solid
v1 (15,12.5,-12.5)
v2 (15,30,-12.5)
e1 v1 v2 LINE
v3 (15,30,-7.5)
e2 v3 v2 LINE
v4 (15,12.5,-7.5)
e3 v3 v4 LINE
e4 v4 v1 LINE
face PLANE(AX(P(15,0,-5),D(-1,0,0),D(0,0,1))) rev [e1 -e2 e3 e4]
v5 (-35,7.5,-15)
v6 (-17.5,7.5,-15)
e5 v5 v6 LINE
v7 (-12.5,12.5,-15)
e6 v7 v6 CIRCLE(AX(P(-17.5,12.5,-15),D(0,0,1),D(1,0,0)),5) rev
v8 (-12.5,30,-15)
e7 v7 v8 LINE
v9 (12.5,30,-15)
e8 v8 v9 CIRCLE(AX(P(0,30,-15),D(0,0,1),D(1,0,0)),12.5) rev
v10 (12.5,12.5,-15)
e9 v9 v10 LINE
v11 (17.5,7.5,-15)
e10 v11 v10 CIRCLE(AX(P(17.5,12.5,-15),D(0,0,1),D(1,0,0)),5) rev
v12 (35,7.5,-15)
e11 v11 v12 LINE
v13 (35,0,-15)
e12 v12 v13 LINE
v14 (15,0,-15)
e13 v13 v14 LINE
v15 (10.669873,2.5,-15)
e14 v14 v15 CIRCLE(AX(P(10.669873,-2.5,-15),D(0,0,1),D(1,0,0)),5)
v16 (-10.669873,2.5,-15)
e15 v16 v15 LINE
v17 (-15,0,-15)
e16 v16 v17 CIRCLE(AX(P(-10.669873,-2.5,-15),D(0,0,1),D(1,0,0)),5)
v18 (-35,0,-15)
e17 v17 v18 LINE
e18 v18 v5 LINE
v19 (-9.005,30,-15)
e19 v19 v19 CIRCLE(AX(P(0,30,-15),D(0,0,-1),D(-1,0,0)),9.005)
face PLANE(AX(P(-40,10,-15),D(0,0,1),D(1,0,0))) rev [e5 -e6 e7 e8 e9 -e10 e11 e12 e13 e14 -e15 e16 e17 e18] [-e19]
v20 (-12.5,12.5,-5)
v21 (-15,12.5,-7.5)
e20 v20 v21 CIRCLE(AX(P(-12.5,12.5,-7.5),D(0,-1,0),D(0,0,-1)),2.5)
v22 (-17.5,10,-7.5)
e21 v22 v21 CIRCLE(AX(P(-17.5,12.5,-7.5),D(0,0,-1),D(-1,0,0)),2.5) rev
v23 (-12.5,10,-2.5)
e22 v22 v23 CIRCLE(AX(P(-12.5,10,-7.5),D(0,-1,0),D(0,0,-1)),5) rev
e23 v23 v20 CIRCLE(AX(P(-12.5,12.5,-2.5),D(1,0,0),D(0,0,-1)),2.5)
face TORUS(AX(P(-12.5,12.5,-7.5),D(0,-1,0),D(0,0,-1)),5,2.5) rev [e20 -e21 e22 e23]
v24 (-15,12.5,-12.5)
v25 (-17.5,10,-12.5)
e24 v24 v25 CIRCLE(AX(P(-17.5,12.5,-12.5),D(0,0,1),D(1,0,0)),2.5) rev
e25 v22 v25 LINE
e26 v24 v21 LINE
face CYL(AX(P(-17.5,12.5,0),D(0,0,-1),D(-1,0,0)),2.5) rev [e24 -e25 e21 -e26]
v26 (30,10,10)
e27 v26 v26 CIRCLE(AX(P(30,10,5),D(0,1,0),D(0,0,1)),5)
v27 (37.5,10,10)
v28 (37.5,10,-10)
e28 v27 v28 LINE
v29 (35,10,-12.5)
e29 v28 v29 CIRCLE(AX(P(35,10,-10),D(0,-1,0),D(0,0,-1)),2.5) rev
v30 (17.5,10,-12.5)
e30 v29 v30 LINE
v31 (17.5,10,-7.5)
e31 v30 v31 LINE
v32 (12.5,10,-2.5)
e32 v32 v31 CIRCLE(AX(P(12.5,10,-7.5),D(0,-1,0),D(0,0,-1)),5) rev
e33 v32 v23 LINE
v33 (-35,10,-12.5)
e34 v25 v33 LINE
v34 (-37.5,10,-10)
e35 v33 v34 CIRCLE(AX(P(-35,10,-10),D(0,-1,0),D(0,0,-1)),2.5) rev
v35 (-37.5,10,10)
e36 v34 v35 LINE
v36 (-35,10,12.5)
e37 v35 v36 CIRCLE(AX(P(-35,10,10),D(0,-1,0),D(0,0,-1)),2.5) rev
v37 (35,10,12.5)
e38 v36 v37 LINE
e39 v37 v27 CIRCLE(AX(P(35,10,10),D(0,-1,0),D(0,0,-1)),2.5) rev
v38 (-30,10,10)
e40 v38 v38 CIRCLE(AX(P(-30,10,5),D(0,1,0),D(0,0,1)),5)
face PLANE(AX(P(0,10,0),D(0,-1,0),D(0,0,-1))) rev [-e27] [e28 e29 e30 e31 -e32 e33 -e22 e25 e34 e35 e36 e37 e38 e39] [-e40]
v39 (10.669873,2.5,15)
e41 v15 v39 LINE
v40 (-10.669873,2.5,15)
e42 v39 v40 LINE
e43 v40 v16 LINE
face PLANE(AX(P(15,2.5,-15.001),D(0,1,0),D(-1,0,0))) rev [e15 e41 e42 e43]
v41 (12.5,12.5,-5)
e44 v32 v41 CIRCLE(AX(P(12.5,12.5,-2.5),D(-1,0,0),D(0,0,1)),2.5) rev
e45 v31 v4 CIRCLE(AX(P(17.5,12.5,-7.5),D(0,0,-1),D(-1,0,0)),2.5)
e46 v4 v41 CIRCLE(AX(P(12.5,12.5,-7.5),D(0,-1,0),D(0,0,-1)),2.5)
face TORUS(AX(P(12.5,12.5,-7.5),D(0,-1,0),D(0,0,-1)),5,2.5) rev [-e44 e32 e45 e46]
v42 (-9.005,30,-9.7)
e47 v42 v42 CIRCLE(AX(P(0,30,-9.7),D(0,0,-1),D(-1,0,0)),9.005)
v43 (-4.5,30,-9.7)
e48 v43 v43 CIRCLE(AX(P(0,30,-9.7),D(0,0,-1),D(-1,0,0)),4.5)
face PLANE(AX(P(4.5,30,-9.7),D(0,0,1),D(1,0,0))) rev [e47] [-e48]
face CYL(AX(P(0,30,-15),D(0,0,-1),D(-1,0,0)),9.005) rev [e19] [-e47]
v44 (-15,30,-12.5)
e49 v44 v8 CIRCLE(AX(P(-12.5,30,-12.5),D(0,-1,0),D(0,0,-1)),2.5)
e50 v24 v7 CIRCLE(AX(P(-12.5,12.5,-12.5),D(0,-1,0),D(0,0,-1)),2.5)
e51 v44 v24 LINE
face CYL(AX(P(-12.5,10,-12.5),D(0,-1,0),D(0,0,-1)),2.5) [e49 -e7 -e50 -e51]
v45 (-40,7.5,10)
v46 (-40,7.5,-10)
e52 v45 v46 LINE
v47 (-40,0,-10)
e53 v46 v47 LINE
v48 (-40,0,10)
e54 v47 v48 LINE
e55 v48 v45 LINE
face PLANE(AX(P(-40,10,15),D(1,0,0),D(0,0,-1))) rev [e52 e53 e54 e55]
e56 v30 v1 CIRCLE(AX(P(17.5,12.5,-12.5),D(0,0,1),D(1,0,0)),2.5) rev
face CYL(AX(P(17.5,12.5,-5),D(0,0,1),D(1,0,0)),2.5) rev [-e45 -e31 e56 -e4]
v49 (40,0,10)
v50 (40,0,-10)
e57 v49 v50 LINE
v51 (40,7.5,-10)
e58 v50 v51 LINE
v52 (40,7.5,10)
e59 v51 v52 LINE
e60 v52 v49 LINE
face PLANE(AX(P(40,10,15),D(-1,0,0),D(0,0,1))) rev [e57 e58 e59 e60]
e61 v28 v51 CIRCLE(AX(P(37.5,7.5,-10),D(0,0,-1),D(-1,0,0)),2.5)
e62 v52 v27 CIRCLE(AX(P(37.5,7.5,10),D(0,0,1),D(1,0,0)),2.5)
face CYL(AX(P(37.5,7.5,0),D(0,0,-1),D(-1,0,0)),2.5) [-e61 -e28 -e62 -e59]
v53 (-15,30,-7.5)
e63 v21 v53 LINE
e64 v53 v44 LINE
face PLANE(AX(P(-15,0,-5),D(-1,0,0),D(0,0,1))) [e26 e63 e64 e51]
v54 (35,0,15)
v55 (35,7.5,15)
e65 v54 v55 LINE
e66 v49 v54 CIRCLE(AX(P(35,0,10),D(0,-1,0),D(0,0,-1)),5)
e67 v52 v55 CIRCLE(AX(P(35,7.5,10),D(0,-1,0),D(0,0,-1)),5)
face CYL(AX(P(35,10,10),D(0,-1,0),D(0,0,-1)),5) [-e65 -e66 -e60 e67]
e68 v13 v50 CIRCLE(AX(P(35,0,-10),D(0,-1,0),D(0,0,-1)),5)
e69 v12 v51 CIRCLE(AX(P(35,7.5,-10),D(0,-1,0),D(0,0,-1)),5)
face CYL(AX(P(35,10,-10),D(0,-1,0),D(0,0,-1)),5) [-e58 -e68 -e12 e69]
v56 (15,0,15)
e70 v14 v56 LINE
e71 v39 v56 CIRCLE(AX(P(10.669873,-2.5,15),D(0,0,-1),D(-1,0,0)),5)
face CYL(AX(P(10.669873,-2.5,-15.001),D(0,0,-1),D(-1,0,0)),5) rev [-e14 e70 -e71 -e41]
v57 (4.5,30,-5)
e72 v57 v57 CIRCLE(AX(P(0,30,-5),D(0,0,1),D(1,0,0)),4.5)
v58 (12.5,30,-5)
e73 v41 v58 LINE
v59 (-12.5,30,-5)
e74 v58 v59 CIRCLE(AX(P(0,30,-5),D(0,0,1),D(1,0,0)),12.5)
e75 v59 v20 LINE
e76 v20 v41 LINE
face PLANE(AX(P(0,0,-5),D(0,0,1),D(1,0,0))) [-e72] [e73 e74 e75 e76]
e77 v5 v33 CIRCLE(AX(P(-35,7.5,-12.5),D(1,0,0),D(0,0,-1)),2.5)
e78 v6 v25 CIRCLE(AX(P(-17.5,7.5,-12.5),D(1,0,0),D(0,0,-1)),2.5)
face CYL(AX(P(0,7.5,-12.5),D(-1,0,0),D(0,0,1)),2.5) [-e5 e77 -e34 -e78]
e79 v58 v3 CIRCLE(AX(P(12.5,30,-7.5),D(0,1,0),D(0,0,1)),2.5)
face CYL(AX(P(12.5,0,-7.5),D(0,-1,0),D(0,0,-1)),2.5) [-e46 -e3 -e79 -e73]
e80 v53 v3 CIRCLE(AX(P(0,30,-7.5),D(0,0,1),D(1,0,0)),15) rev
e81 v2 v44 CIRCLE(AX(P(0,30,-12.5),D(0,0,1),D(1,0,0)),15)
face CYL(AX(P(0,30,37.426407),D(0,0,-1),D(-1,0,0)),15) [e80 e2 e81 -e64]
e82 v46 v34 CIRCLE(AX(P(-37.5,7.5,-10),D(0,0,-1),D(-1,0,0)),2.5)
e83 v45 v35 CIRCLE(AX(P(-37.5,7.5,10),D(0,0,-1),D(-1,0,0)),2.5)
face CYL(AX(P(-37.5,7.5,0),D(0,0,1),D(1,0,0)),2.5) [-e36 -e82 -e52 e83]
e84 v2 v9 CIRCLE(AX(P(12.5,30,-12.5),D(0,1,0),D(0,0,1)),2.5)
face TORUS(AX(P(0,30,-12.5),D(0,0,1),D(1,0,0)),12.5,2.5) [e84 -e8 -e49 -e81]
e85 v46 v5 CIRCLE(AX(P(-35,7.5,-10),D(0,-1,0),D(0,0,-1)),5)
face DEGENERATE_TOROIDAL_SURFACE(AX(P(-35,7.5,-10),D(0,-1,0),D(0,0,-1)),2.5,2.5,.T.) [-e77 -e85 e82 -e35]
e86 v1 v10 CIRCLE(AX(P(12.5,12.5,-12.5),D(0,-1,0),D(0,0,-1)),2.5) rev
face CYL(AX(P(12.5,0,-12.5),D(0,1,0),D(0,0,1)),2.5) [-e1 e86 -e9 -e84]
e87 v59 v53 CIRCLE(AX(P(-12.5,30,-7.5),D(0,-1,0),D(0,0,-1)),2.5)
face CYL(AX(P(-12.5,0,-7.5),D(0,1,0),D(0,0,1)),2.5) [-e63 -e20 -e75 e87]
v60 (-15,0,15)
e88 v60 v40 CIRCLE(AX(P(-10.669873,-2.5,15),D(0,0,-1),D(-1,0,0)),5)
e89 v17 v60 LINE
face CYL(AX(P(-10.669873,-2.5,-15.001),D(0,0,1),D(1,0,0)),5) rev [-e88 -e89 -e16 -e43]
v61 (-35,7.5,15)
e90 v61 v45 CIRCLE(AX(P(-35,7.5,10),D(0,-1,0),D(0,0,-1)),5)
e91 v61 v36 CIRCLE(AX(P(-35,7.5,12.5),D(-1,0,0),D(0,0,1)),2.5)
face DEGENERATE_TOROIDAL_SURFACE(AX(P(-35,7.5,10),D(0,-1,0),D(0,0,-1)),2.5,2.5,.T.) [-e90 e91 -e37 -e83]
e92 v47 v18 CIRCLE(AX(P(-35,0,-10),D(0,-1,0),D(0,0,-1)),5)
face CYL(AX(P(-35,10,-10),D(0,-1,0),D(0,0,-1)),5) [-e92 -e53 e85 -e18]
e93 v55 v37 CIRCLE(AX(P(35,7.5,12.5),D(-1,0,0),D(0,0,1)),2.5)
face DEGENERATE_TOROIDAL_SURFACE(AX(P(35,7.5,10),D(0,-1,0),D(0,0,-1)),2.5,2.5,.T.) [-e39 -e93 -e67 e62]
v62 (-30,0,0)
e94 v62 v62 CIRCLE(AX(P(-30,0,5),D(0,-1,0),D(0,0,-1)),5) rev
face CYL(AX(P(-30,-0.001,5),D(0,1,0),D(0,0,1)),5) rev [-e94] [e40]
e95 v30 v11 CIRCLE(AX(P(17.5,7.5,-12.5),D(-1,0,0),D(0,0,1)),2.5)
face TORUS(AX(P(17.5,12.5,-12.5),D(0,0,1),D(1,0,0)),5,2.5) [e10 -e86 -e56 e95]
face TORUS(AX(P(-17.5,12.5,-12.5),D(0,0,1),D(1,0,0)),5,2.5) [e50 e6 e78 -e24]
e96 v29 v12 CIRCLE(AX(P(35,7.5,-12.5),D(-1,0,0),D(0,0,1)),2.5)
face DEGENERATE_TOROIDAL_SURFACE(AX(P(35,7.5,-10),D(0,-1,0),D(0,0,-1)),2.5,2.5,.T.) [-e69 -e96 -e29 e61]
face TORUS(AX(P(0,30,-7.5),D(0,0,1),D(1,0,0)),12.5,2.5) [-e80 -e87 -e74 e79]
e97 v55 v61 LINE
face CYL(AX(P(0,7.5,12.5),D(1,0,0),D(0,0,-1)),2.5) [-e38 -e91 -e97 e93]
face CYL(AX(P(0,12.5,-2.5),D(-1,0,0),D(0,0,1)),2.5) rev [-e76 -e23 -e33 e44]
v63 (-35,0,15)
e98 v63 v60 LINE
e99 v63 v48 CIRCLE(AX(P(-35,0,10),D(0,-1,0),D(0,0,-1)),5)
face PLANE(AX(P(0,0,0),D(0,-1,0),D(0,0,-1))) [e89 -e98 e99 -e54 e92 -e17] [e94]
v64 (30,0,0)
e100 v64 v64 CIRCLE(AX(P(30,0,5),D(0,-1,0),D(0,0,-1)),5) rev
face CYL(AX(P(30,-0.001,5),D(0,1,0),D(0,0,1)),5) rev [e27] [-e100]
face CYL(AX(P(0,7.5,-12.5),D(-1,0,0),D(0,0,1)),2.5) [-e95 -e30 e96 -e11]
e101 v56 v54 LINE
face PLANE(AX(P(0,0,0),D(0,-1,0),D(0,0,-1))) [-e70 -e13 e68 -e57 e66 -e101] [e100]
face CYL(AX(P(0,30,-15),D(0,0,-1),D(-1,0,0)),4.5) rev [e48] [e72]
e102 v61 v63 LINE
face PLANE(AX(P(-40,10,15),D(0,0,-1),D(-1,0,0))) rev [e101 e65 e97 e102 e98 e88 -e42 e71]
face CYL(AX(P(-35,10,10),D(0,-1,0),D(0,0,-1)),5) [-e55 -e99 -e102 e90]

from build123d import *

# Parameters (mm, degrees)
SKETCH1_W                               = 80
SKETCH1_H                               = 30
BOSS_EXTRUDE1_DEPTH                     = 10
BOSS_EXTRUDE2_DEPTH                     = 10
SKETCH4_R                               = 15
BOSS_EXTRUDE3_DEPTH                     = 10
CBORE_FOR_M5_HEX_HEAD_BOLT1_D           = 9
CBORE_FOR_M5_HEX_HEAD_BOLT1_CBORE_D     = 18.01
CBORE_FOR_M5_HEX_HEAD_BOLT1_CBORE_DEPTH = 5.3
CUT_EXTRUDE1_REACH                      = 69.268
SKETCH7_W                               = 30
SKETCH7_H                               = 2.5
CUT_EXTRUDE2_REACH                      = 57.227
SKETCH8_R                               = 5
FILLET1_R                               = 5
FILLET2_R                               = 2.5


with BuildPart() as part:
    # Sketch1 → Boss-Extrude1 (new body)
    with BuildSketch(Plane(origin=(0, 0, 0), x_dir=(1, 0, 0), z_dir=(0, 1, 0))):
        Rectangle(SKETCH1_W, SKETCH1_H)
    extrude(amount=BOSS_EXTRUDE1_DEPTH)

    # Sketch2 → Boss-Extrude2 (add)
    with BuildSketch(Plane(origin=(0, 0, -15), x_dir=(-1, 0, 0), z_dir=(0, 0, -1))):
        Polygon((0, 30), (15, 30), (15, 0), (-15, 0), (-15, 30), align=None)
    extrude(amount=-BOSS_EXTRUDE2_DEPTH)

    # Sketch4 → Boss-Extrude3 (add)
    with BuildSketch(Plane(origin=(0, 0, -15), x_dir=(-1, 0, 0), z_dir=(0, 0, -1))):
        with Locations((0, 30)):
            Circle(SKETCH4_R)
    extrude(amount=-BOSS_EXTRUDE3_DEPTH)

    # CBORE for M5 Hex Head Bolt1 (through all)
    with Locations(Plane(origin=(0, 0, -15), x_dir=(-1, 0, 0), z_dir=(0, 0, -1))):
        with Locations((0, 30)):
            CounterBoreHole(CBORE_FOR_M5_HEX_HEAD_BOLT1_D / 2, CBORE_FOR_M5_HEX_HEAD_BOLT1_CBORE_D / 2, CBORE_FOR_M5_HEX_HEAD_BOLT1_CBORE_DEPTH)

    # Sketch7 → Cut-Extrude1 (cut, up to next)
    with BuildSketch(Plane.XY.offset(15), mode=Mode.PRIVATE) as cut_extrude1_sk1:
        with Locations((0, 1.25)):
            Rectangle(SKETCH7_W, SKETCH7_H)
    cut_extrude1_tool1 = extrude(cut_extrude1_sk1.sketch, amount=-CUT_EXTRUDE1_REACH, mode=Mode.PRIVATE) & part.part
    add(cut_extrude1_tool1.solids().sort_by_distance((0, 1.25, 15))[0], mode=Mode.SUBTRACT)

    # Sketch8 → Cut-Extrude2 (cut, up to next)
    with BuildSketch(Plane(origin=(0, 10, 0), x_dir=(1, 0, 0), z_dir=(0, 1, 0)), mode=Mode.PRIVATE) as cut_extrude2_sk1:
        with Locations(Location((-30, -5, 0), (0, 0, 270))):
            Circle(SKETCH8_R)
    cut_extrude2_tool1 = extrude(cut_extrude2_sk1.sketch, amount=-CUT_EXTRUDE2_REACH, mode=Mode.PRIVATE) & part.part
    # Sketch8 → Cut-Extrude2 (cut, up to next)
    with BuildSketch(Plane(origin=(0, 10, 0), x_dir=(1, 0, 0), z_dir=(0, 1, 0)), mode=Mode.PRIVATE) as cut_extrude2_sk2:
        with Locations(Location((30, -5, 0), (0, 0, 270))):
            Circle(SKETCH8_R)
    cut_extrude2_tool2 = extrude(cut_extrude2_sk2.sketch, amount=-CUT_EXTRUDE2_REACH, mode=Mode.PRIVATE) & part.part
    add(cut_extrude2_tool1.solids().sort_by_distance((-30, 10, 5))[0], mode=Mode.SUBTRACT)
    add(cut_extrude2_tool2.solids().sort_by_distance((30, 10, 5))[0], mode=Mode.SUBTRACT)

    # Fillet1
    # the kernel refuses this fillet: 5 mm, written as the material it adds along each edge
    with BuildSketch(Plane(origin=(15, 2.5, 15), x_dir=(-1, 0, 0), z_dir=(0, 0, -1))) as fillet1_piece_1:
        with BuildLine():
            CenterArc((4.330127019, -5), FILLET1_R, 90, 60)
            Line((0, -2.5), (0, 0))
            Line((0, 0), (4.330127019, 0))
        make_face()
    extrude(amount=30)
    with BuildSketch(Plane(origin=(-15, 2.5, 15), x_dir=(0, -1, 0), z_dir=(0, 0, -1))) as fillet1_piece_2:
        with BuildLine():
            CenterArc((5, -4.330127019), FILLET1_R, 120, 60)
            Line((0, -4.330127019), (0, 0))
            Line((0, 0), (2.5, 0))
        make_face()
    extrude(amount=30)
    # the kernel refuses this fillet: 5 mm, written as the material it takes off along each edge
    with BuildSketch(Plane(origin=(-40, -12.5, -15), x_dir=(0, 0, 1), z_dir=(0, 1, 0)), Plane(origin=(-40, -12.5, 15), x_dir=(1, 0, 0), z_dir=(0, 1, 0))) as fillet1_2_piece_1:
        with BuildLine():
            CenterArc((FILLET1_R, FILLET1_R), FILLET1_R, 180, 90)
            Line((0, FILLET1_R), (0, 0))
            Line((0, 0), (FILLET1_R, 0))
        make_face()
    extrude(amount=35, mode=Mode.SUBTRACT)
    with BuildSketch(Plane(origin=(40, -12.5, -15), x_dir=(0, 0, 1), z_dir=(0, 1, 0)), Plane(origin=(40, -12.5, 15), x_dir=(-1, 0, 0), z_dir=(0, 1, 0))) as fillet1_2_piece_2:
        with BuildLine():
            CenterArc((FILLET1_R, -FILLET1_R), FILLET1_R, 90, 90)
            Line((0, -FILLET1_R), (0, 0))
            Line((0, 0), (FILLET1_R, 0))
        make_face()
    extrude(amount=35, mode=Mode.SUBTRACT)

    # Fillet2
    fillet2_edges = [part.edges().sort_by_distance(p)[0] for p in [
        (-25, 10, -15),
        (-15, 20, -5),
        (15, 10, -10),
        (15, 20, -15),
        (15, 20, -5),
        (-15, 20, -15),
        (-15, 10, -10),
        (0, 10, -5),
        (0, 45, -15),
        (0, 45, -5),
        (-40, 10, 0),
        (25, 10, -15),
        (0, 10, 15),
        (40, 10, 0),
        (38.535533906, 10, 13.535533906),
        (38.535533906, 10, -13.535533906),
        (-38.535533906, 10, 13.535533906),
        (-38.535533906, 10, -13.535533906),
    ]]
    fillet(fillet2_edges, radius=FILLET2_R)


solid = part.part
